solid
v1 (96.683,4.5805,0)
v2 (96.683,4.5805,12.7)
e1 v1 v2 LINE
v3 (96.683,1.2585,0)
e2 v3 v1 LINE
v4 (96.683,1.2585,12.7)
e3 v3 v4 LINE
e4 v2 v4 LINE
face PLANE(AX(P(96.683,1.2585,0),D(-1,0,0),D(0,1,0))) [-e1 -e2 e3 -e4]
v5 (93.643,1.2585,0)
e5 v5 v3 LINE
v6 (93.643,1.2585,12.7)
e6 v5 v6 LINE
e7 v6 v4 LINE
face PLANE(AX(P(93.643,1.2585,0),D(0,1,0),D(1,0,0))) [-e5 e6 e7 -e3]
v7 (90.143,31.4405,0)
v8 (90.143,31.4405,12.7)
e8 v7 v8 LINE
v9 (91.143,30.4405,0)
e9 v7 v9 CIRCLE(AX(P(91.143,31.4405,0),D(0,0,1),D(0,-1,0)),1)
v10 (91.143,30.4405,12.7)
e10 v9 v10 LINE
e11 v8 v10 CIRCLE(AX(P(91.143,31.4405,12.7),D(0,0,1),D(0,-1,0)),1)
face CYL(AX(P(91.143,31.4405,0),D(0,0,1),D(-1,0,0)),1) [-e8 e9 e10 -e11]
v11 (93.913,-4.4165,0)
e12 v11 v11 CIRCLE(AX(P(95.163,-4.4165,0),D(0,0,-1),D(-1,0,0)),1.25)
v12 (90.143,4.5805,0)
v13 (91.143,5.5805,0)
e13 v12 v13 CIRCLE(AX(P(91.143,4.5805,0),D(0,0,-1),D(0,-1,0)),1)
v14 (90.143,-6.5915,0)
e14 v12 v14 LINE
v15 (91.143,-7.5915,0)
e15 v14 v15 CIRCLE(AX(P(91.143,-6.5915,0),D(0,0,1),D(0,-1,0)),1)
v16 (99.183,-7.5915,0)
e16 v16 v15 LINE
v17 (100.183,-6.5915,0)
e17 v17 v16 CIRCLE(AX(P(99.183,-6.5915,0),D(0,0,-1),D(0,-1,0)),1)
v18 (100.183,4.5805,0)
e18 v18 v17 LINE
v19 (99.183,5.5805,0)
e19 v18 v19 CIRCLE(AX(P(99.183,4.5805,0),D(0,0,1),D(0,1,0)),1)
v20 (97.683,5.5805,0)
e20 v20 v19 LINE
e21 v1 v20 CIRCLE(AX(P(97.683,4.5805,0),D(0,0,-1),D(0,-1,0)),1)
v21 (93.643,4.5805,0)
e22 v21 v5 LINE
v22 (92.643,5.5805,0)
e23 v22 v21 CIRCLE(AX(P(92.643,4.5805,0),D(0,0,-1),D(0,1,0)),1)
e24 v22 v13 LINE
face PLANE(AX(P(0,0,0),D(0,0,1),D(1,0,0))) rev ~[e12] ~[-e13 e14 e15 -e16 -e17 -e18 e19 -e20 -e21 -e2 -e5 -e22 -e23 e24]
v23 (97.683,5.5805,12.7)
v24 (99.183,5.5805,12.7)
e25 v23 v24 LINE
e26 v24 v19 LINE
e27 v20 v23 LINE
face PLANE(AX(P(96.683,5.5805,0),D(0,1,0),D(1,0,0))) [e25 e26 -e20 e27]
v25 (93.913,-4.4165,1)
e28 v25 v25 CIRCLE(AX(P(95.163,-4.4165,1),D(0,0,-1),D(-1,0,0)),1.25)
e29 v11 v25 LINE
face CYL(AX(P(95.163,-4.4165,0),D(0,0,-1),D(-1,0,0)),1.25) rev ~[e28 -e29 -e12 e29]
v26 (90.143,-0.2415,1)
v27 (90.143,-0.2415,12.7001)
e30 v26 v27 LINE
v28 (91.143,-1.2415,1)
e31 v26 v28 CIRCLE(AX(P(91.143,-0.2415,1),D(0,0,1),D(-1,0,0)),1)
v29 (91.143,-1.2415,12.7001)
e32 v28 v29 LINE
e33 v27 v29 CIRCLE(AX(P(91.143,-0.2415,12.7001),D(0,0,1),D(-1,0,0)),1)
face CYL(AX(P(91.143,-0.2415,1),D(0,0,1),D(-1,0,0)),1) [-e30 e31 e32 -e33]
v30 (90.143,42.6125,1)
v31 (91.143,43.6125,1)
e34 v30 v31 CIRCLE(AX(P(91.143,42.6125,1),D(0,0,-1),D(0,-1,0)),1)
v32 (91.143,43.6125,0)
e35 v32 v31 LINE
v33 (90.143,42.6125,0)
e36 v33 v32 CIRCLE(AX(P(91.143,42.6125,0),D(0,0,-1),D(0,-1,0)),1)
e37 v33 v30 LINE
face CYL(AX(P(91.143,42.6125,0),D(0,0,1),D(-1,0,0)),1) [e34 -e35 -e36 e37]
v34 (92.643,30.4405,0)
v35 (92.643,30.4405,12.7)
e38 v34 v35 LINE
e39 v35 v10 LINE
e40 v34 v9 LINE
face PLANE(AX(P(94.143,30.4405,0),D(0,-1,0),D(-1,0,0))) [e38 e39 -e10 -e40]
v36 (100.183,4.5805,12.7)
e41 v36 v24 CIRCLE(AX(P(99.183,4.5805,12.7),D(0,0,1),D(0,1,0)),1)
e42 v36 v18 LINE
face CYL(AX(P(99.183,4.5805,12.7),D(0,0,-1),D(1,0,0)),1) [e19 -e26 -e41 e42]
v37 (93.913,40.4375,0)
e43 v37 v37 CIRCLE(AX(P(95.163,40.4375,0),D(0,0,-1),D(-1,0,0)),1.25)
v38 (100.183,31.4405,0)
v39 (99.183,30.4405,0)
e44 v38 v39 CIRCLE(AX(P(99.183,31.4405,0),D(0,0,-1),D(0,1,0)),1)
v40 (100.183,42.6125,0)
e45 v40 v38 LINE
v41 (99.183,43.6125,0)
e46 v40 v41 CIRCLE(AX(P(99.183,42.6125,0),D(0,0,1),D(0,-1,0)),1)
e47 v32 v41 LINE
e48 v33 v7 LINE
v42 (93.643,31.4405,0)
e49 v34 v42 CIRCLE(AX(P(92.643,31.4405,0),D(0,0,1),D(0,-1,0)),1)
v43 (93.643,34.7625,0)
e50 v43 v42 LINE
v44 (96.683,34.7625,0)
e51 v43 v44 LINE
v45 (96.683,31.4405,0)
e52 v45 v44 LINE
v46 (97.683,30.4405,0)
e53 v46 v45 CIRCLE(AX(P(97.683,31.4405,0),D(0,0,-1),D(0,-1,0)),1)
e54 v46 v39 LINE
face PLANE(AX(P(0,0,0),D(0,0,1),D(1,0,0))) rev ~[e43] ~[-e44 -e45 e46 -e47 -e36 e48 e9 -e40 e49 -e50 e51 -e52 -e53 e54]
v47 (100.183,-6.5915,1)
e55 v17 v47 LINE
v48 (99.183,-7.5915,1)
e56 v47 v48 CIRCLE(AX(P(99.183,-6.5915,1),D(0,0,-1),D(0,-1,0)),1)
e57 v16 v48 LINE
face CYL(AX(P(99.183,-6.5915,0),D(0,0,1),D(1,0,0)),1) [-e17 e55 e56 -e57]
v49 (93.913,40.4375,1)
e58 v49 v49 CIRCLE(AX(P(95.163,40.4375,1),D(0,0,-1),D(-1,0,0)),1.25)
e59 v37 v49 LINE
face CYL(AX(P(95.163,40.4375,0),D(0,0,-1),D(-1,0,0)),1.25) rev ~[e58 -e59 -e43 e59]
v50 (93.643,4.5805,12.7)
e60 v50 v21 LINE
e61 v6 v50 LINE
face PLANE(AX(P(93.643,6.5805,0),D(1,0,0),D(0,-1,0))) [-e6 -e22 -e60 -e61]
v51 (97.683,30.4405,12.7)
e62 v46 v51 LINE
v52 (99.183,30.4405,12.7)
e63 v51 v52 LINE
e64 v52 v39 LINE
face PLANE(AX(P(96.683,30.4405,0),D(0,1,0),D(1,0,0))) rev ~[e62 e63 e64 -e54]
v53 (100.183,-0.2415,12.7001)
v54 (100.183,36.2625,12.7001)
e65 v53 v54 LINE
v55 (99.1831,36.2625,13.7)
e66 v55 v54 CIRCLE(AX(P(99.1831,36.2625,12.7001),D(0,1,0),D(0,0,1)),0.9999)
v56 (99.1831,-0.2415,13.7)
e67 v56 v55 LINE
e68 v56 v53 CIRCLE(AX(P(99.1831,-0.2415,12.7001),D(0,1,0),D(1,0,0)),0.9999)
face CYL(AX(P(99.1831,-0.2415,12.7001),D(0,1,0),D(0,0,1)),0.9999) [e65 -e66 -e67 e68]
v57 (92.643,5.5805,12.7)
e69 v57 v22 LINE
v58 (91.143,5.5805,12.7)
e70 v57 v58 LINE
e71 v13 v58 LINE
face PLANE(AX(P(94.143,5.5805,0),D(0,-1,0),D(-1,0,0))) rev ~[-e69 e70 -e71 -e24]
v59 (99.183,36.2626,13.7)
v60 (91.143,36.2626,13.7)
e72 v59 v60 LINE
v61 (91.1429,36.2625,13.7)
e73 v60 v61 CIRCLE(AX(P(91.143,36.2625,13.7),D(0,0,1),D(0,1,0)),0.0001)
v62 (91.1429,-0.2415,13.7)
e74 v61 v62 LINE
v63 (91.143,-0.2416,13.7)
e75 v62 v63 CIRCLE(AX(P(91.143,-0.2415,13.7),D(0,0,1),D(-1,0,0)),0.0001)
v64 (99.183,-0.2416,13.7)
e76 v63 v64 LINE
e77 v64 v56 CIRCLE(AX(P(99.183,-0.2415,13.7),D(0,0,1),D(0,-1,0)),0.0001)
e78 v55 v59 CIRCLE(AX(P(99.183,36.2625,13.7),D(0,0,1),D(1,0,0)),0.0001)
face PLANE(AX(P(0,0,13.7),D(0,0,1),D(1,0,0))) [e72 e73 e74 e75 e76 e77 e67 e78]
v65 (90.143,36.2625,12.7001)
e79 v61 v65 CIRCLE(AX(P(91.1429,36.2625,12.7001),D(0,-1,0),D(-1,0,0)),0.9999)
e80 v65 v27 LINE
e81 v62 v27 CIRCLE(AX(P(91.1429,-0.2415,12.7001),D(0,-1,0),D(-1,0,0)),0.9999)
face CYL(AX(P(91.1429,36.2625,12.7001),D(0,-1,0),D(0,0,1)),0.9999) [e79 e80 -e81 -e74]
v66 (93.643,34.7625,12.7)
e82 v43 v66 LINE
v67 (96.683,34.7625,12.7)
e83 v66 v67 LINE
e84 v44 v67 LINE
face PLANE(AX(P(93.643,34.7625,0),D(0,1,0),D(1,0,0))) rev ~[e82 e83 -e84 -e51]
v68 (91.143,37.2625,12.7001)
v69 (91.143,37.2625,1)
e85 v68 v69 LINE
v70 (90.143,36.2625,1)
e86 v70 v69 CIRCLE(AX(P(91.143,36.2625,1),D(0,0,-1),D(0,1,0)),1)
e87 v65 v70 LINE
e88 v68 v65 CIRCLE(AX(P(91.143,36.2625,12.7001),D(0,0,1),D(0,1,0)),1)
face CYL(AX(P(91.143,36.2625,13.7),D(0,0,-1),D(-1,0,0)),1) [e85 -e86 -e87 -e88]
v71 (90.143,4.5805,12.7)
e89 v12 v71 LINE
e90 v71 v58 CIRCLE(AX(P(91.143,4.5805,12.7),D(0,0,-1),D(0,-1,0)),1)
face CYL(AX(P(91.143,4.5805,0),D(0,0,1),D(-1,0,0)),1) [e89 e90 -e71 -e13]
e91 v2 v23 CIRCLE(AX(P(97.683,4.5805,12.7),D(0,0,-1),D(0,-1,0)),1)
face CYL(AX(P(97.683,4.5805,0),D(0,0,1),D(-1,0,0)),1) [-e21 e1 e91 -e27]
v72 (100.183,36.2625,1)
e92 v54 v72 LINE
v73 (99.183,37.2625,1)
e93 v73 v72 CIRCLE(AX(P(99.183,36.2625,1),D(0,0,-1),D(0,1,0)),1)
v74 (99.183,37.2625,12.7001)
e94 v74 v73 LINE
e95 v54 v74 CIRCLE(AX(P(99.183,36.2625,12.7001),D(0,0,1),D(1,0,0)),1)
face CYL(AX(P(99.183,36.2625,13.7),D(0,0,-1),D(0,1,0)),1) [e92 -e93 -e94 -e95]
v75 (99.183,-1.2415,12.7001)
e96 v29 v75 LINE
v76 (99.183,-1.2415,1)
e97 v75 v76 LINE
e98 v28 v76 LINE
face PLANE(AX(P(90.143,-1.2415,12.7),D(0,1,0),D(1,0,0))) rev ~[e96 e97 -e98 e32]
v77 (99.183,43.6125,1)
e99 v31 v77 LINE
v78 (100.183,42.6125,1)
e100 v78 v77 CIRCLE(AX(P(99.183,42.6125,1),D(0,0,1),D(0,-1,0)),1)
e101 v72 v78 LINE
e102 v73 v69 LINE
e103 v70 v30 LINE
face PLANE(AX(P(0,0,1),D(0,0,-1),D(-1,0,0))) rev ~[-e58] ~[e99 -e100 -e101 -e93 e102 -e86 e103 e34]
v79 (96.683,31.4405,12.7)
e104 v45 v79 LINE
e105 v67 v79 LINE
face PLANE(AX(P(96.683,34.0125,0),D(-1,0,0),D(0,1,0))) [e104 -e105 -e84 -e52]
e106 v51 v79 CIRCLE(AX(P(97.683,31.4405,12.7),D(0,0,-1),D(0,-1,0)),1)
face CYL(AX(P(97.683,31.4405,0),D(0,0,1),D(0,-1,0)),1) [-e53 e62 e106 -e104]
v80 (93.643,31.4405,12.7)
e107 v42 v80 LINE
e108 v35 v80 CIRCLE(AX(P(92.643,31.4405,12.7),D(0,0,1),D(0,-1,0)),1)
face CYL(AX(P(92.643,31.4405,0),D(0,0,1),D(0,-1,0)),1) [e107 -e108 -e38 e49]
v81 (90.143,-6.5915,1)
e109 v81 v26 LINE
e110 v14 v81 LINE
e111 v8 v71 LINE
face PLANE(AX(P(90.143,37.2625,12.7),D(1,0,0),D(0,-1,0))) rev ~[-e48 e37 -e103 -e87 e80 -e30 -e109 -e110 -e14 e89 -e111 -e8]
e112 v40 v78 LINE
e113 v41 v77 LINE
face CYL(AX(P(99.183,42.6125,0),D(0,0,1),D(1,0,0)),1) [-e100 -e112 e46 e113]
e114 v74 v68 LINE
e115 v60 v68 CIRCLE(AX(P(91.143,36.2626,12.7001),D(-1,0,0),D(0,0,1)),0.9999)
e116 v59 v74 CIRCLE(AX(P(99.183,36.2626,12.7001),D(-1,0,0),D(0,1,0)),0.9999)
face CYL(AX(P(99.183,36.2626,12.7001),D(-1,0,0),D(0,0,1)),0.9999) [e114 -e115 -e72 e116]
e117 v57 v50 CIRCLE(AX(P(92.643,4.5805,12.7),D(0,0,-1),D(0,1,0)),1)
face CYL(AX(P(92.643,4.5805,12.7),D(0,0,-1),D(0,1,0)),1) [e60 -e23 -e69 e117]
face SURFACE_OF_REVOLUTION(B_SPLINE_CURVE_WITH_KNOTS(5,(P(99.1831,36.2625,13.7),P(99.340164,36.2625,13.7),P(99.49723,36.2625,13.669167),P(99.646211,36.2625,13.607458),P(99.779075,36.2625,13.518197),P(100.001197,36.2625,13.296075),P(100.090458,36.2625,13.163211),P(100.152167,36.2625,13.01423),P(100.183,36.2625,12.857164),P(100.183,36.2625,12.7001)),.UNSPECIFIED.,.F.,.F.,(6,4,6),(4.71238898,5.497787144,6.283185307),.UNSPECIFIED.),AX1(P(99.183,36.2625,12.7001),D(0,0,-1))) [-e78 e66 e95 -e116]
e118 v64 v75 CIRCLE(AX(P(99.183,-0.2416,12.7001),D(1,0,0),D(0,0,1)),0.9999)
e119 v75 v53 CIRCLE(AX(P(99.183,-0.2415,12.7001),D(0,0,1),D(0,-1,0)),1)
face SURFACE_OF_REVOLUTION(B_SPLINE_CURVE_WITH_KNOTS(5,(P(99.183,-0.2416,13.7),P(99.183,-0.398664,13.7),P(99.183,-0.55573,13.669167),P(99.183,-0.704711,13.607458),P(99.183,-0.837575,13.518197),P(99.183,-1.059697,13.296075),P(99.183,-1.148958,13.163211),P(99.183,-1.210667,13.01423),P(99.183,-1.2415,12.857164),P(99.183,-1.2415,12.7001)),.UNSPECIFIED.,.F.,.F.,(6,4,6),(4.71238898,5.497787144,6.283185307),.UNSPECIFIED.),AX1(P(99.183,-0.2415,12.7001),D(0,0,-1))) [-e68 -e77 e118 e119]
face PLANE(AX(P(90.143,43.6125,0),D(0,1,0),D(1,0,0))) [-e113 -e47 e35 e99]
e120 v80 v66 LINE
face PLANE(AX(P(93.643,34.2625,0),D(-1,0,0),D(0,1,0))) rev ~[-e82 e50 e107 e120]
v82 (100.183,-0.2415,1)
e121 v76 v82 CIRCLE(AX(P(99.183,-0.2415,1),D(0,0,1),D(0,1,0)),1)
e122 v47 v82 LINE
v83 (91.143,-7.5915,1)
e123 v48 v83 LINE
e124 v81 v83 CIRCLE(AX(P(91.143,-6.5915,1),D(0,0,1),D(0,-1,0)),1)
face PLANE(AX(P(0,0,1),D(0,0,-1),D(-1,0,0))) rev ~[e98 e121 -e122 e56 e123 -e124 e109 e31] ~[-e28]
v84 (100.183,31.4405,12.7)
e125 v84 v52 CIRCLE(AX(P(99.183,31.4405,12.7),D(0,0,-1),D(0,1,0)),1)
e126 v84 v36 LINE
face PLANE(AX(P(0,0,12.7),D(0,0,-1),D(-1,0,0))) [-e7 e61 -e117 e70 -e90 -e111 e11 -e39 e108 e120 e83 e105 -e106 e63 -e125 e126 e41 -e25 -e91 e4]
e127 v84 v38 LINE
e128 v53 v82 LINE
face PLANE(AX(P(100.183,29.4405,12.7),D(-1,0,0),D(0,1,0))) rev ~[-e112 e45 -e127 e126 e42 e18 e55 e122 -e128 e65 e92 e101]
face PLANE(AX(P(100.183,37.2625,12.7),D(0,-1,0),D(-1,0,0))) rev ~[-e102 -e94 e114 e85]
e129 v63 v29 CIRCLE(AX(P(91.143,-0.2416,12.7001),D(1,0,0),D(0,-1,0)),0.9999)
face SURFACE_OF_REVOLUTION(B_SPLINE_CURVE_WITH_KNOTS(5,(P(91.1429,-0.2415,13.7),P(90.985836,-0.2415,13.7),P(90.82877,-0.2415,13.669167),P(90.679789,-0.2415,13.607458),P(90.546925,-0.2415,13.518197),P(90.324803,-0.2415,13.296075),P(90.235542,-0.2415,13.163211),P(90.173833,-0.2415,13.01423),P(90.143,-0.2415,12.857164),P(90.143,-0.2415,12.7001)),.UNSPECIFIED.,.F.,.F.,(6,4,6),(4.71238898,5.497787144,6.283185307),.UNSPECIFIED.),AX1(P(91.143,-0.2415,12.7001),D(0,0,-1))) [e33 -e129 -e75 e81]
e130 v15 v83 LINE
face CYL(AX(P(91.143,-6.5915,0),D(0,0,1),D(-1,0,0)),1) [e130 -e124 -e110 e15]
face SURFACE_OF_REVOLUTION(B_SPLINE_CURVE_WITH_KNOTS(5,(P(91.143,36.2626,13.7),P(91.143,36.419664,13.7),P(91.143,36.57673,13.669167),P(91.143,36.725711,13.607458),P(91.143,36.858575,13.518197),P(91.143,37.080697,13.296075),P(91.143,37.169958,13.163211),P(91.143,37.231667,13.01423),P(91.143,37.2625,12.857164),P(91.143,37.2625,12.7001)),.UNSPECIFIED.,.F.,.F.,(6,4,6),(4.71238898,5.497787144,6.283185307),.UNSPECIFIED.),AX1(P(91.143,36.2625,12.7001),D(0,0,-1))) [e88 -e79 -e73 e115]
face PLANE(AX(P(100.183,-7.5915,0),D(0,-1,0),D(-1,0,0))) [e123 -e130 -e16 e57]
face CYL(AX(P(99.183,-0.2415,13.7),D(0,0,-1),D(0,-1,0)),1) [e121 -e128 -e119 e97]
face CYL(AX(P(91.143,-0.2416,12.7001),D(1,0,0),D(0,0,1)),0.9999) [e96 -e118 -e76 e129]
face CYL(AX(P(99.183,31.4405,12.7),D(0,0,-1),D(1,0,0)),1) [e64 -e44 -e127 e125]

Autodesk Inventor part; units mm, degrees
ref_plane "YZ Plane" through (0, 0, 0) normal (1, 0, 0) x (0, 1, 0)
ref_plane "XZ Plane" through (0, 0, 0) normal (0, 1, 0) x (-1, 0, 0)
ref_plane "XY Plane" through (0, 0, 0) normal (0, 0, 1) x (1, 0, 0)
sketch "Sketch1" plane through (0, 0, 0) normal (0, 0, 1) x (1, 0, 0)
  line L0 (93.893, 28.1705) -> (89.575, 28.1705) projected
  line L1 (89.575, 12.9305) -> (89.575, 28.1705) projected
  line L2 (89.575, 7.8505) -> (89.575, 12.9305) projected
  line L3 (93.893, 7.8505) -> (89.575, 7.8505) projected
  line L4 (93.893, 7.8505) -> (93.893, 2.0085) projected
  line L5 (93.893, 2.0085) -> (96.433, 2.0085) projected
  line L6 (96.433, 7.8505) -> (96.433, 2.0085) projected
  line L7 (112.435, 7.8505) -> (96.433, 7.8505) projected
  line L8 (112.435, 7.8505) -> (112.435, 28.1705) projected
  line L9 (112.435, 28.1705) -> (96.433, 28.1705) projected
  line L10 (96.433, 34.0125) -> (96.433, 28.1705) projected
  line L11 (93.893, 34.0125) -> (96.433, 34.0125) projected
  line L12 (93.893, 34.0125) -> (93.893, 28.1705) projected
  line L13 (93.893, 6.5805) -> (89.575, 6.5805) projected
  line L14 (112.435, 6.5805) -> (96.433, 6.5805) projected
  line L15 (93.893, 29.4405) -> (89.575, 29.4405) projected
  line L16 (112.435, 29.4405) -> (96.433, 29.4405) projected
  line L17 (93.893, 6.5805) -> (93.643, 6.5805)
  line L18 (93.643, 6.5805) -> (93.643, 2.0085)
  line L19 (93.643, 2.0085) -> (93.643, 1.7585)
  line L20 (93.643, 1.7585) -> (90.143, 1.7585)
  line L21 (90.143, 1.7585) -> (90.143, 6.5805)
  line L22 (95.163, 2.0085) -> (95.163, 1.3114)
  line L23 (96.683, 6.5805) -> (96.683, 2.0085)
  line L24 (96.683, 2.0085) -> (96.683, 1.7585)
  line L25 (96.683, 1.7585) -> (100.183, 1.7585)
  line L26 (100.183, 1.7585) -> (100.183, 6.5805)
  line L27 (90.143, 1.7585) -> (100.183, 1.7585)
  line L28 (100.183, 1.7585) -> (100.183, -1.2415)
  line L29 (100.183, -1.2415) -> (90.143, -1.2415)
  line L30 (90.143, -1.2415) -> (90.143, 1.7585)
  line L31 (112.435, 18.0105) -> (108.4742, 18.0105)
  line L32 (93.893, 28.1705) -> (93.893, 34.0125)
  line L33 (93.893, 34.0125) -> (96.433, 34.0125)
  line L34 (96.433, 28.1705) -> (96.433, 34.0125)
  line L35 (112.435, 6.5805) -> (96.433, 6.5805)
  line L36 (93.643, 29.4405) -> (93.643, 34.0125)
  line L37 (93.643, 34.0125) -> (93.643, 34.2625)
  line L38 (93.643, 34.2625) -> (90.143, 34.2625)
  line L39 (90.143, 34.2625) -> (90.143, 29.4405)
  line L40 (95.163, 34.0125) -> (95.163, 34.7096)
  line L41 (96.683, 29.4405) -> (96.683, 34.0125)
  line L42 (100.183, 34.2625) -> (100.183, 29.4405)
  line L43 (96.683, 34.0125) -> (96.683, 34.2625)
  line L44 (96.683, 34.2625) -> (100.183, 34.2625)
  line L45 (90.143, 34.2625) -> (100.183, 34.2625)
  line L46 (100.183, 34.2625) -> (100.183, 37.2625)
  line L47 (100.183, 37.2625) -> (90.143, 37.2625)
  line L48 (90.143, 37.2625) -> (90.143, 34.2625)
  line L49 (96.683, 6.5805) -> (100.183, 6.5805)
  line L50 (100.183, 6.5805) -> (100.183, -1.2415)
  line L51 (100.183, -1.2415) -> (96.683, -1.2415)
  line L52 (96.683, -1.2415) -> (96.683, 6.5805)
  line L53 (96.683, 29.4405) -> (100.183, 29.4405)
  line L54 (100.183, 29.4405) -> (100.183, 37.2625)
  line L55 (100.183, 37.2625) -> (96.683, 37.2625)
  line L56 (96.683, 37.2625) -> (96.683, 29.4405)
  line L57 (90.143, 29.4405) -> (93.643, 29.4405)
  line L58 (93.643, 29.4405) -> (93.643, 37.2625)
  line L59 (93.643, 37.2625) -> (90.143, 37.2625)
  line L60 (90.143, 37.2625) -> (90.143, 29.4405)
  point P0 (0, 0)
  dimension "d0" = 0.25
  dimension "d1" = 0.25
  dimension "d2" = 3.5
  dimension "d3" = 3
extrude "Extrusion1" add sketch "Sketch1" along normal blind 12.7 contours L15 L39 L38 L37 L36 | L45 L58 L47 L56 | L48 L47 L58 L38 | L44 L42 L16 L41 L43 | L56 L47 L46 L44 | L18 L19 L20 L21 L13 | L27 L52 L29 L30 L20 | L24 L23 L14 L26 L25 | L25 L28 L29 L52
sketch "Sketch2" plane through (0, 0, 12.7) normal (0, 0, 1) x (1, 0, 0)
  line L0 (90.143, 6.5805) -> (90.143, -1.2415) projected
  line L1 (100.183, 29.4405) -> (100.183, 37.2625) projected
  line L2 (90.143, -1.2415) -> (100.183, -1.2415)
  line L3 (100.183, -1.2415) -> (100.183, 37.2625)
  line L4 (100.183, 37.2625) -> (90.143, 37.2625)
  line L5 (90.143, 37.2625) -> (90.143, -1.2415)
  point P0 (0, 0)
extrude "Extrusion2" add sketch "Sketch2" along normal blind 1
sketch "Sketch3" plane through (0, 0, 0) normal (0, 0, -1) x (-1, 0, 0)
  line L0 (-90.143, -1.2415) -> (-100.183, -1.2415) projected
  line L1 (-100.183, 37.2625) -> (-90.143, 37.2625) projected
  line L2 (-90.143, -1.2415) -> (-100.183, -1.2415)
  line L3 (-100.183, -1.2415) -> (-100.183, -7.5915)
  line L4 (-100.183, -7.5915) -> (-90.143, -7.5915)
  line L5 (-90.143, -7.5915) -> (-90.143, -1.2415)
  line L6 (-100.183, 29.4405) -> (-100.183, 37.2625) projected
  line L7 (-100.183, 37.2625) -> (-90.143, 37.2625)
  line L8 (-90.143, 37.2625) -> (-90.143, 43.6125)
  line L9 (-90.143, 43.6125) -> (-100.183, 43.6125)
  line L10 (-100.183, 43.6125) -> (-100.183, 37.2625)
  circle A0 centre (-95.163, -4.4165) radius 1.25
  circle A1 centre (-95.163, 40.4375) radius 1.25
  point P0 (0, 0)
  point P1 (-90.143, -4.4165)
  point P2 (-90.143, 40.4375)
  point P3 (-95.163, 43.6125)
  point P4 (-95.163, -7.5915)
  dimension "d8" = 6.35
  dimension "d9" = 6.35
  dimension "d10" = 2.5
  dimension "d11" = 2.5
extrude "Extrusion3" add sketch "Sketch3" against normal blind 1
fillet "Fillet2" radius 1 4 edges at (90.143, 43.6125, 0.5) (100.183, 43.6125, 0.5) (90.143, -7.5915, 0.5) (100.183, -7.5915, 0.5)
sketch "Sketch4" plane through (0, 0, 0) normal (0, 0, -1) x (-1, 0, 0)
  line L0 (-100.183, 6.5805) -> (-96.683, 6.5805) projected
  line L1 (-96.683, 6.5805) -> (-96.683, 5.5805)
  line L2 (-96.683, 6.5805) -> (-96.683, 1.7585) projected
  line L3 (-96.683, 5.5805) -> (-100.1874, 5.5805)
  line L4 (-100.1874, 5.5805) -> (-100.1874, 6.5805)
  line L5 (-100.1874, 6.5805) -> (-96.683, 6.5805)
  line L6 (-94.143, 2.0085) -> (-94.143, 7.8505) projected
  line L7 (-94.143, 6.5805) -> (-89.825, 6.5805) projected
  line L8 (-90.143, 29.4405) -> (-90.143, 6.5805) projected
  line L9 (-94.143, 5.5805) -> (-90.143, 5.5805)
  line L10 (-90.143, 5.5805) -> (-90.143, 6.5805)
  line L11 (-90.143, 6.5805) -> (-94.143, 6.5805)
  line L12 (-94.143, 6.5805) -> (-94.143, 5.5805)
  line L13 (-100.183, 6.5805) -> (-100.183, 29.4405) projected
  line L14 (-100.183, 18.0105) -> (-103.7607, 18.0105)
  line L15 (-100.183, 29.4405) -> (-96.683, 29.4405)
  line L16 (-96.683, 29.4405) -> (-96.683, 30.4405)
  line L17 (-96.683, 29.4405) -> (-96.683, 34.2625)
  line L18 (-96.683, 30.4405) -> (-100.1874, 30.4405)
  line L19 (-100.1874, 30.4405) -> (-100.1874, 29.4405)
  line L20 (-100.1874, 29.4405) -> (-96.683, 29.4405)
  line L21 (-94.143, 34.0125) -> (-94.143, 28.1705)
  line L22 (-94.143, 29.4405) -> (-89.825, 29.4405)
  line L23 (-90.143, 6.5805) -> (-90.143, 29.4405)
  line L24 (-94.143, 30.4405) -> (-90.143, 30.4405)
  line L25 (-90.143, 30.4405) -> (-90.143, 29.4405)
  line L26 (-90.143, 29.4405) -> (-94.143, 29.4405)
  line L27 (-94.143, 29.4405) -> (-94.143, 30.4405)
  line L28 (-100.183, 29.4405) -> (-100.183, 6.5805)
  point P0 (0, 0)
  dimension "d17" = 1
  dimension "d23" = 1
extrude "Extrusion4" cut sketch "Sketch4" against normal up to surface (12.7 mm away)
fillet "Fillet4" radius 1 8 edges at (96.683, 5.5805, 6.35) (100.183, 5.5805, 6.35) (93.643, 5.5805, 6.35) (90.143, 5.5805, 6.35) (100.183, 30.4405, 6.35) (96.683, 30.4405, 6.35) (93.643, 30.4405, 6.35) (90.143, 30.4405, 6.35)
fillet "Fillet5" radius 1 4 edges at (100.183, -1.2415, 7.35) (90.143, -1.2415, 7.35) (100.183, 37.2625, 7.35) (90.143, 37.2625, 7.35)
fillet "Fillet6" radius 1 8 edges at (90.4359, -0.9486, 13.7) (95.163, -1.2415, 13.7) (99.8901, -0.9486, 13.7) (100.183, 18.0105, 13.7) (99.8901, 36.9696, 13.7) (95.163, 37.2625, 13.7) (90.4359, 36.9696, 13.7) (90.143, 18.0105, 13.7)
sketch "Sketch5" plane through (0, 0, 0) normal (0, 0, -1) x (-1, 0, 0)
  line L0 (-96.683, 1.7585) -> (-93.643, 1.7585) projected
  line L1 (-96.683, 1.7585) -> (-93.643, 1.7585)
  line L2 (-93.643, 1.7585) -> (-93.643, 1.2585)
  line L3 (-93.643, 1.2585) -> (-96.683, 1.2585)
  line L4 (-96.683, 1.2585) -> (-96.683, 1.7585)
  line L5 (-100.183, 4.5805) -> (-100.183, 31.4405) projected
  line L6 (-100.183, 18.0105) -> (-106.4704, 18.0105)
  line L7 (-96.683, 34.2625) -> (-93.643, 34.2625)
  line L8 (-96.683, 34.2625) -> (-93.643, 34.2625)
  line L9 (-93.643, 34.2625) -> (-93.643, 34.7625)
  line L10 (-93.643, 34.7625) -> (-96.683, 34.7625)
  line L11 (-96.683, 34.7625) -> (-96.683, 34.2625)
  point P0 (0, 0)
  dimension "d24" = 0.5
extrude "Extrusion5" cut sketch "Sketch5" against normal up to surface (12.7 mm away)
properties part number "BackWheelServoClasp"
